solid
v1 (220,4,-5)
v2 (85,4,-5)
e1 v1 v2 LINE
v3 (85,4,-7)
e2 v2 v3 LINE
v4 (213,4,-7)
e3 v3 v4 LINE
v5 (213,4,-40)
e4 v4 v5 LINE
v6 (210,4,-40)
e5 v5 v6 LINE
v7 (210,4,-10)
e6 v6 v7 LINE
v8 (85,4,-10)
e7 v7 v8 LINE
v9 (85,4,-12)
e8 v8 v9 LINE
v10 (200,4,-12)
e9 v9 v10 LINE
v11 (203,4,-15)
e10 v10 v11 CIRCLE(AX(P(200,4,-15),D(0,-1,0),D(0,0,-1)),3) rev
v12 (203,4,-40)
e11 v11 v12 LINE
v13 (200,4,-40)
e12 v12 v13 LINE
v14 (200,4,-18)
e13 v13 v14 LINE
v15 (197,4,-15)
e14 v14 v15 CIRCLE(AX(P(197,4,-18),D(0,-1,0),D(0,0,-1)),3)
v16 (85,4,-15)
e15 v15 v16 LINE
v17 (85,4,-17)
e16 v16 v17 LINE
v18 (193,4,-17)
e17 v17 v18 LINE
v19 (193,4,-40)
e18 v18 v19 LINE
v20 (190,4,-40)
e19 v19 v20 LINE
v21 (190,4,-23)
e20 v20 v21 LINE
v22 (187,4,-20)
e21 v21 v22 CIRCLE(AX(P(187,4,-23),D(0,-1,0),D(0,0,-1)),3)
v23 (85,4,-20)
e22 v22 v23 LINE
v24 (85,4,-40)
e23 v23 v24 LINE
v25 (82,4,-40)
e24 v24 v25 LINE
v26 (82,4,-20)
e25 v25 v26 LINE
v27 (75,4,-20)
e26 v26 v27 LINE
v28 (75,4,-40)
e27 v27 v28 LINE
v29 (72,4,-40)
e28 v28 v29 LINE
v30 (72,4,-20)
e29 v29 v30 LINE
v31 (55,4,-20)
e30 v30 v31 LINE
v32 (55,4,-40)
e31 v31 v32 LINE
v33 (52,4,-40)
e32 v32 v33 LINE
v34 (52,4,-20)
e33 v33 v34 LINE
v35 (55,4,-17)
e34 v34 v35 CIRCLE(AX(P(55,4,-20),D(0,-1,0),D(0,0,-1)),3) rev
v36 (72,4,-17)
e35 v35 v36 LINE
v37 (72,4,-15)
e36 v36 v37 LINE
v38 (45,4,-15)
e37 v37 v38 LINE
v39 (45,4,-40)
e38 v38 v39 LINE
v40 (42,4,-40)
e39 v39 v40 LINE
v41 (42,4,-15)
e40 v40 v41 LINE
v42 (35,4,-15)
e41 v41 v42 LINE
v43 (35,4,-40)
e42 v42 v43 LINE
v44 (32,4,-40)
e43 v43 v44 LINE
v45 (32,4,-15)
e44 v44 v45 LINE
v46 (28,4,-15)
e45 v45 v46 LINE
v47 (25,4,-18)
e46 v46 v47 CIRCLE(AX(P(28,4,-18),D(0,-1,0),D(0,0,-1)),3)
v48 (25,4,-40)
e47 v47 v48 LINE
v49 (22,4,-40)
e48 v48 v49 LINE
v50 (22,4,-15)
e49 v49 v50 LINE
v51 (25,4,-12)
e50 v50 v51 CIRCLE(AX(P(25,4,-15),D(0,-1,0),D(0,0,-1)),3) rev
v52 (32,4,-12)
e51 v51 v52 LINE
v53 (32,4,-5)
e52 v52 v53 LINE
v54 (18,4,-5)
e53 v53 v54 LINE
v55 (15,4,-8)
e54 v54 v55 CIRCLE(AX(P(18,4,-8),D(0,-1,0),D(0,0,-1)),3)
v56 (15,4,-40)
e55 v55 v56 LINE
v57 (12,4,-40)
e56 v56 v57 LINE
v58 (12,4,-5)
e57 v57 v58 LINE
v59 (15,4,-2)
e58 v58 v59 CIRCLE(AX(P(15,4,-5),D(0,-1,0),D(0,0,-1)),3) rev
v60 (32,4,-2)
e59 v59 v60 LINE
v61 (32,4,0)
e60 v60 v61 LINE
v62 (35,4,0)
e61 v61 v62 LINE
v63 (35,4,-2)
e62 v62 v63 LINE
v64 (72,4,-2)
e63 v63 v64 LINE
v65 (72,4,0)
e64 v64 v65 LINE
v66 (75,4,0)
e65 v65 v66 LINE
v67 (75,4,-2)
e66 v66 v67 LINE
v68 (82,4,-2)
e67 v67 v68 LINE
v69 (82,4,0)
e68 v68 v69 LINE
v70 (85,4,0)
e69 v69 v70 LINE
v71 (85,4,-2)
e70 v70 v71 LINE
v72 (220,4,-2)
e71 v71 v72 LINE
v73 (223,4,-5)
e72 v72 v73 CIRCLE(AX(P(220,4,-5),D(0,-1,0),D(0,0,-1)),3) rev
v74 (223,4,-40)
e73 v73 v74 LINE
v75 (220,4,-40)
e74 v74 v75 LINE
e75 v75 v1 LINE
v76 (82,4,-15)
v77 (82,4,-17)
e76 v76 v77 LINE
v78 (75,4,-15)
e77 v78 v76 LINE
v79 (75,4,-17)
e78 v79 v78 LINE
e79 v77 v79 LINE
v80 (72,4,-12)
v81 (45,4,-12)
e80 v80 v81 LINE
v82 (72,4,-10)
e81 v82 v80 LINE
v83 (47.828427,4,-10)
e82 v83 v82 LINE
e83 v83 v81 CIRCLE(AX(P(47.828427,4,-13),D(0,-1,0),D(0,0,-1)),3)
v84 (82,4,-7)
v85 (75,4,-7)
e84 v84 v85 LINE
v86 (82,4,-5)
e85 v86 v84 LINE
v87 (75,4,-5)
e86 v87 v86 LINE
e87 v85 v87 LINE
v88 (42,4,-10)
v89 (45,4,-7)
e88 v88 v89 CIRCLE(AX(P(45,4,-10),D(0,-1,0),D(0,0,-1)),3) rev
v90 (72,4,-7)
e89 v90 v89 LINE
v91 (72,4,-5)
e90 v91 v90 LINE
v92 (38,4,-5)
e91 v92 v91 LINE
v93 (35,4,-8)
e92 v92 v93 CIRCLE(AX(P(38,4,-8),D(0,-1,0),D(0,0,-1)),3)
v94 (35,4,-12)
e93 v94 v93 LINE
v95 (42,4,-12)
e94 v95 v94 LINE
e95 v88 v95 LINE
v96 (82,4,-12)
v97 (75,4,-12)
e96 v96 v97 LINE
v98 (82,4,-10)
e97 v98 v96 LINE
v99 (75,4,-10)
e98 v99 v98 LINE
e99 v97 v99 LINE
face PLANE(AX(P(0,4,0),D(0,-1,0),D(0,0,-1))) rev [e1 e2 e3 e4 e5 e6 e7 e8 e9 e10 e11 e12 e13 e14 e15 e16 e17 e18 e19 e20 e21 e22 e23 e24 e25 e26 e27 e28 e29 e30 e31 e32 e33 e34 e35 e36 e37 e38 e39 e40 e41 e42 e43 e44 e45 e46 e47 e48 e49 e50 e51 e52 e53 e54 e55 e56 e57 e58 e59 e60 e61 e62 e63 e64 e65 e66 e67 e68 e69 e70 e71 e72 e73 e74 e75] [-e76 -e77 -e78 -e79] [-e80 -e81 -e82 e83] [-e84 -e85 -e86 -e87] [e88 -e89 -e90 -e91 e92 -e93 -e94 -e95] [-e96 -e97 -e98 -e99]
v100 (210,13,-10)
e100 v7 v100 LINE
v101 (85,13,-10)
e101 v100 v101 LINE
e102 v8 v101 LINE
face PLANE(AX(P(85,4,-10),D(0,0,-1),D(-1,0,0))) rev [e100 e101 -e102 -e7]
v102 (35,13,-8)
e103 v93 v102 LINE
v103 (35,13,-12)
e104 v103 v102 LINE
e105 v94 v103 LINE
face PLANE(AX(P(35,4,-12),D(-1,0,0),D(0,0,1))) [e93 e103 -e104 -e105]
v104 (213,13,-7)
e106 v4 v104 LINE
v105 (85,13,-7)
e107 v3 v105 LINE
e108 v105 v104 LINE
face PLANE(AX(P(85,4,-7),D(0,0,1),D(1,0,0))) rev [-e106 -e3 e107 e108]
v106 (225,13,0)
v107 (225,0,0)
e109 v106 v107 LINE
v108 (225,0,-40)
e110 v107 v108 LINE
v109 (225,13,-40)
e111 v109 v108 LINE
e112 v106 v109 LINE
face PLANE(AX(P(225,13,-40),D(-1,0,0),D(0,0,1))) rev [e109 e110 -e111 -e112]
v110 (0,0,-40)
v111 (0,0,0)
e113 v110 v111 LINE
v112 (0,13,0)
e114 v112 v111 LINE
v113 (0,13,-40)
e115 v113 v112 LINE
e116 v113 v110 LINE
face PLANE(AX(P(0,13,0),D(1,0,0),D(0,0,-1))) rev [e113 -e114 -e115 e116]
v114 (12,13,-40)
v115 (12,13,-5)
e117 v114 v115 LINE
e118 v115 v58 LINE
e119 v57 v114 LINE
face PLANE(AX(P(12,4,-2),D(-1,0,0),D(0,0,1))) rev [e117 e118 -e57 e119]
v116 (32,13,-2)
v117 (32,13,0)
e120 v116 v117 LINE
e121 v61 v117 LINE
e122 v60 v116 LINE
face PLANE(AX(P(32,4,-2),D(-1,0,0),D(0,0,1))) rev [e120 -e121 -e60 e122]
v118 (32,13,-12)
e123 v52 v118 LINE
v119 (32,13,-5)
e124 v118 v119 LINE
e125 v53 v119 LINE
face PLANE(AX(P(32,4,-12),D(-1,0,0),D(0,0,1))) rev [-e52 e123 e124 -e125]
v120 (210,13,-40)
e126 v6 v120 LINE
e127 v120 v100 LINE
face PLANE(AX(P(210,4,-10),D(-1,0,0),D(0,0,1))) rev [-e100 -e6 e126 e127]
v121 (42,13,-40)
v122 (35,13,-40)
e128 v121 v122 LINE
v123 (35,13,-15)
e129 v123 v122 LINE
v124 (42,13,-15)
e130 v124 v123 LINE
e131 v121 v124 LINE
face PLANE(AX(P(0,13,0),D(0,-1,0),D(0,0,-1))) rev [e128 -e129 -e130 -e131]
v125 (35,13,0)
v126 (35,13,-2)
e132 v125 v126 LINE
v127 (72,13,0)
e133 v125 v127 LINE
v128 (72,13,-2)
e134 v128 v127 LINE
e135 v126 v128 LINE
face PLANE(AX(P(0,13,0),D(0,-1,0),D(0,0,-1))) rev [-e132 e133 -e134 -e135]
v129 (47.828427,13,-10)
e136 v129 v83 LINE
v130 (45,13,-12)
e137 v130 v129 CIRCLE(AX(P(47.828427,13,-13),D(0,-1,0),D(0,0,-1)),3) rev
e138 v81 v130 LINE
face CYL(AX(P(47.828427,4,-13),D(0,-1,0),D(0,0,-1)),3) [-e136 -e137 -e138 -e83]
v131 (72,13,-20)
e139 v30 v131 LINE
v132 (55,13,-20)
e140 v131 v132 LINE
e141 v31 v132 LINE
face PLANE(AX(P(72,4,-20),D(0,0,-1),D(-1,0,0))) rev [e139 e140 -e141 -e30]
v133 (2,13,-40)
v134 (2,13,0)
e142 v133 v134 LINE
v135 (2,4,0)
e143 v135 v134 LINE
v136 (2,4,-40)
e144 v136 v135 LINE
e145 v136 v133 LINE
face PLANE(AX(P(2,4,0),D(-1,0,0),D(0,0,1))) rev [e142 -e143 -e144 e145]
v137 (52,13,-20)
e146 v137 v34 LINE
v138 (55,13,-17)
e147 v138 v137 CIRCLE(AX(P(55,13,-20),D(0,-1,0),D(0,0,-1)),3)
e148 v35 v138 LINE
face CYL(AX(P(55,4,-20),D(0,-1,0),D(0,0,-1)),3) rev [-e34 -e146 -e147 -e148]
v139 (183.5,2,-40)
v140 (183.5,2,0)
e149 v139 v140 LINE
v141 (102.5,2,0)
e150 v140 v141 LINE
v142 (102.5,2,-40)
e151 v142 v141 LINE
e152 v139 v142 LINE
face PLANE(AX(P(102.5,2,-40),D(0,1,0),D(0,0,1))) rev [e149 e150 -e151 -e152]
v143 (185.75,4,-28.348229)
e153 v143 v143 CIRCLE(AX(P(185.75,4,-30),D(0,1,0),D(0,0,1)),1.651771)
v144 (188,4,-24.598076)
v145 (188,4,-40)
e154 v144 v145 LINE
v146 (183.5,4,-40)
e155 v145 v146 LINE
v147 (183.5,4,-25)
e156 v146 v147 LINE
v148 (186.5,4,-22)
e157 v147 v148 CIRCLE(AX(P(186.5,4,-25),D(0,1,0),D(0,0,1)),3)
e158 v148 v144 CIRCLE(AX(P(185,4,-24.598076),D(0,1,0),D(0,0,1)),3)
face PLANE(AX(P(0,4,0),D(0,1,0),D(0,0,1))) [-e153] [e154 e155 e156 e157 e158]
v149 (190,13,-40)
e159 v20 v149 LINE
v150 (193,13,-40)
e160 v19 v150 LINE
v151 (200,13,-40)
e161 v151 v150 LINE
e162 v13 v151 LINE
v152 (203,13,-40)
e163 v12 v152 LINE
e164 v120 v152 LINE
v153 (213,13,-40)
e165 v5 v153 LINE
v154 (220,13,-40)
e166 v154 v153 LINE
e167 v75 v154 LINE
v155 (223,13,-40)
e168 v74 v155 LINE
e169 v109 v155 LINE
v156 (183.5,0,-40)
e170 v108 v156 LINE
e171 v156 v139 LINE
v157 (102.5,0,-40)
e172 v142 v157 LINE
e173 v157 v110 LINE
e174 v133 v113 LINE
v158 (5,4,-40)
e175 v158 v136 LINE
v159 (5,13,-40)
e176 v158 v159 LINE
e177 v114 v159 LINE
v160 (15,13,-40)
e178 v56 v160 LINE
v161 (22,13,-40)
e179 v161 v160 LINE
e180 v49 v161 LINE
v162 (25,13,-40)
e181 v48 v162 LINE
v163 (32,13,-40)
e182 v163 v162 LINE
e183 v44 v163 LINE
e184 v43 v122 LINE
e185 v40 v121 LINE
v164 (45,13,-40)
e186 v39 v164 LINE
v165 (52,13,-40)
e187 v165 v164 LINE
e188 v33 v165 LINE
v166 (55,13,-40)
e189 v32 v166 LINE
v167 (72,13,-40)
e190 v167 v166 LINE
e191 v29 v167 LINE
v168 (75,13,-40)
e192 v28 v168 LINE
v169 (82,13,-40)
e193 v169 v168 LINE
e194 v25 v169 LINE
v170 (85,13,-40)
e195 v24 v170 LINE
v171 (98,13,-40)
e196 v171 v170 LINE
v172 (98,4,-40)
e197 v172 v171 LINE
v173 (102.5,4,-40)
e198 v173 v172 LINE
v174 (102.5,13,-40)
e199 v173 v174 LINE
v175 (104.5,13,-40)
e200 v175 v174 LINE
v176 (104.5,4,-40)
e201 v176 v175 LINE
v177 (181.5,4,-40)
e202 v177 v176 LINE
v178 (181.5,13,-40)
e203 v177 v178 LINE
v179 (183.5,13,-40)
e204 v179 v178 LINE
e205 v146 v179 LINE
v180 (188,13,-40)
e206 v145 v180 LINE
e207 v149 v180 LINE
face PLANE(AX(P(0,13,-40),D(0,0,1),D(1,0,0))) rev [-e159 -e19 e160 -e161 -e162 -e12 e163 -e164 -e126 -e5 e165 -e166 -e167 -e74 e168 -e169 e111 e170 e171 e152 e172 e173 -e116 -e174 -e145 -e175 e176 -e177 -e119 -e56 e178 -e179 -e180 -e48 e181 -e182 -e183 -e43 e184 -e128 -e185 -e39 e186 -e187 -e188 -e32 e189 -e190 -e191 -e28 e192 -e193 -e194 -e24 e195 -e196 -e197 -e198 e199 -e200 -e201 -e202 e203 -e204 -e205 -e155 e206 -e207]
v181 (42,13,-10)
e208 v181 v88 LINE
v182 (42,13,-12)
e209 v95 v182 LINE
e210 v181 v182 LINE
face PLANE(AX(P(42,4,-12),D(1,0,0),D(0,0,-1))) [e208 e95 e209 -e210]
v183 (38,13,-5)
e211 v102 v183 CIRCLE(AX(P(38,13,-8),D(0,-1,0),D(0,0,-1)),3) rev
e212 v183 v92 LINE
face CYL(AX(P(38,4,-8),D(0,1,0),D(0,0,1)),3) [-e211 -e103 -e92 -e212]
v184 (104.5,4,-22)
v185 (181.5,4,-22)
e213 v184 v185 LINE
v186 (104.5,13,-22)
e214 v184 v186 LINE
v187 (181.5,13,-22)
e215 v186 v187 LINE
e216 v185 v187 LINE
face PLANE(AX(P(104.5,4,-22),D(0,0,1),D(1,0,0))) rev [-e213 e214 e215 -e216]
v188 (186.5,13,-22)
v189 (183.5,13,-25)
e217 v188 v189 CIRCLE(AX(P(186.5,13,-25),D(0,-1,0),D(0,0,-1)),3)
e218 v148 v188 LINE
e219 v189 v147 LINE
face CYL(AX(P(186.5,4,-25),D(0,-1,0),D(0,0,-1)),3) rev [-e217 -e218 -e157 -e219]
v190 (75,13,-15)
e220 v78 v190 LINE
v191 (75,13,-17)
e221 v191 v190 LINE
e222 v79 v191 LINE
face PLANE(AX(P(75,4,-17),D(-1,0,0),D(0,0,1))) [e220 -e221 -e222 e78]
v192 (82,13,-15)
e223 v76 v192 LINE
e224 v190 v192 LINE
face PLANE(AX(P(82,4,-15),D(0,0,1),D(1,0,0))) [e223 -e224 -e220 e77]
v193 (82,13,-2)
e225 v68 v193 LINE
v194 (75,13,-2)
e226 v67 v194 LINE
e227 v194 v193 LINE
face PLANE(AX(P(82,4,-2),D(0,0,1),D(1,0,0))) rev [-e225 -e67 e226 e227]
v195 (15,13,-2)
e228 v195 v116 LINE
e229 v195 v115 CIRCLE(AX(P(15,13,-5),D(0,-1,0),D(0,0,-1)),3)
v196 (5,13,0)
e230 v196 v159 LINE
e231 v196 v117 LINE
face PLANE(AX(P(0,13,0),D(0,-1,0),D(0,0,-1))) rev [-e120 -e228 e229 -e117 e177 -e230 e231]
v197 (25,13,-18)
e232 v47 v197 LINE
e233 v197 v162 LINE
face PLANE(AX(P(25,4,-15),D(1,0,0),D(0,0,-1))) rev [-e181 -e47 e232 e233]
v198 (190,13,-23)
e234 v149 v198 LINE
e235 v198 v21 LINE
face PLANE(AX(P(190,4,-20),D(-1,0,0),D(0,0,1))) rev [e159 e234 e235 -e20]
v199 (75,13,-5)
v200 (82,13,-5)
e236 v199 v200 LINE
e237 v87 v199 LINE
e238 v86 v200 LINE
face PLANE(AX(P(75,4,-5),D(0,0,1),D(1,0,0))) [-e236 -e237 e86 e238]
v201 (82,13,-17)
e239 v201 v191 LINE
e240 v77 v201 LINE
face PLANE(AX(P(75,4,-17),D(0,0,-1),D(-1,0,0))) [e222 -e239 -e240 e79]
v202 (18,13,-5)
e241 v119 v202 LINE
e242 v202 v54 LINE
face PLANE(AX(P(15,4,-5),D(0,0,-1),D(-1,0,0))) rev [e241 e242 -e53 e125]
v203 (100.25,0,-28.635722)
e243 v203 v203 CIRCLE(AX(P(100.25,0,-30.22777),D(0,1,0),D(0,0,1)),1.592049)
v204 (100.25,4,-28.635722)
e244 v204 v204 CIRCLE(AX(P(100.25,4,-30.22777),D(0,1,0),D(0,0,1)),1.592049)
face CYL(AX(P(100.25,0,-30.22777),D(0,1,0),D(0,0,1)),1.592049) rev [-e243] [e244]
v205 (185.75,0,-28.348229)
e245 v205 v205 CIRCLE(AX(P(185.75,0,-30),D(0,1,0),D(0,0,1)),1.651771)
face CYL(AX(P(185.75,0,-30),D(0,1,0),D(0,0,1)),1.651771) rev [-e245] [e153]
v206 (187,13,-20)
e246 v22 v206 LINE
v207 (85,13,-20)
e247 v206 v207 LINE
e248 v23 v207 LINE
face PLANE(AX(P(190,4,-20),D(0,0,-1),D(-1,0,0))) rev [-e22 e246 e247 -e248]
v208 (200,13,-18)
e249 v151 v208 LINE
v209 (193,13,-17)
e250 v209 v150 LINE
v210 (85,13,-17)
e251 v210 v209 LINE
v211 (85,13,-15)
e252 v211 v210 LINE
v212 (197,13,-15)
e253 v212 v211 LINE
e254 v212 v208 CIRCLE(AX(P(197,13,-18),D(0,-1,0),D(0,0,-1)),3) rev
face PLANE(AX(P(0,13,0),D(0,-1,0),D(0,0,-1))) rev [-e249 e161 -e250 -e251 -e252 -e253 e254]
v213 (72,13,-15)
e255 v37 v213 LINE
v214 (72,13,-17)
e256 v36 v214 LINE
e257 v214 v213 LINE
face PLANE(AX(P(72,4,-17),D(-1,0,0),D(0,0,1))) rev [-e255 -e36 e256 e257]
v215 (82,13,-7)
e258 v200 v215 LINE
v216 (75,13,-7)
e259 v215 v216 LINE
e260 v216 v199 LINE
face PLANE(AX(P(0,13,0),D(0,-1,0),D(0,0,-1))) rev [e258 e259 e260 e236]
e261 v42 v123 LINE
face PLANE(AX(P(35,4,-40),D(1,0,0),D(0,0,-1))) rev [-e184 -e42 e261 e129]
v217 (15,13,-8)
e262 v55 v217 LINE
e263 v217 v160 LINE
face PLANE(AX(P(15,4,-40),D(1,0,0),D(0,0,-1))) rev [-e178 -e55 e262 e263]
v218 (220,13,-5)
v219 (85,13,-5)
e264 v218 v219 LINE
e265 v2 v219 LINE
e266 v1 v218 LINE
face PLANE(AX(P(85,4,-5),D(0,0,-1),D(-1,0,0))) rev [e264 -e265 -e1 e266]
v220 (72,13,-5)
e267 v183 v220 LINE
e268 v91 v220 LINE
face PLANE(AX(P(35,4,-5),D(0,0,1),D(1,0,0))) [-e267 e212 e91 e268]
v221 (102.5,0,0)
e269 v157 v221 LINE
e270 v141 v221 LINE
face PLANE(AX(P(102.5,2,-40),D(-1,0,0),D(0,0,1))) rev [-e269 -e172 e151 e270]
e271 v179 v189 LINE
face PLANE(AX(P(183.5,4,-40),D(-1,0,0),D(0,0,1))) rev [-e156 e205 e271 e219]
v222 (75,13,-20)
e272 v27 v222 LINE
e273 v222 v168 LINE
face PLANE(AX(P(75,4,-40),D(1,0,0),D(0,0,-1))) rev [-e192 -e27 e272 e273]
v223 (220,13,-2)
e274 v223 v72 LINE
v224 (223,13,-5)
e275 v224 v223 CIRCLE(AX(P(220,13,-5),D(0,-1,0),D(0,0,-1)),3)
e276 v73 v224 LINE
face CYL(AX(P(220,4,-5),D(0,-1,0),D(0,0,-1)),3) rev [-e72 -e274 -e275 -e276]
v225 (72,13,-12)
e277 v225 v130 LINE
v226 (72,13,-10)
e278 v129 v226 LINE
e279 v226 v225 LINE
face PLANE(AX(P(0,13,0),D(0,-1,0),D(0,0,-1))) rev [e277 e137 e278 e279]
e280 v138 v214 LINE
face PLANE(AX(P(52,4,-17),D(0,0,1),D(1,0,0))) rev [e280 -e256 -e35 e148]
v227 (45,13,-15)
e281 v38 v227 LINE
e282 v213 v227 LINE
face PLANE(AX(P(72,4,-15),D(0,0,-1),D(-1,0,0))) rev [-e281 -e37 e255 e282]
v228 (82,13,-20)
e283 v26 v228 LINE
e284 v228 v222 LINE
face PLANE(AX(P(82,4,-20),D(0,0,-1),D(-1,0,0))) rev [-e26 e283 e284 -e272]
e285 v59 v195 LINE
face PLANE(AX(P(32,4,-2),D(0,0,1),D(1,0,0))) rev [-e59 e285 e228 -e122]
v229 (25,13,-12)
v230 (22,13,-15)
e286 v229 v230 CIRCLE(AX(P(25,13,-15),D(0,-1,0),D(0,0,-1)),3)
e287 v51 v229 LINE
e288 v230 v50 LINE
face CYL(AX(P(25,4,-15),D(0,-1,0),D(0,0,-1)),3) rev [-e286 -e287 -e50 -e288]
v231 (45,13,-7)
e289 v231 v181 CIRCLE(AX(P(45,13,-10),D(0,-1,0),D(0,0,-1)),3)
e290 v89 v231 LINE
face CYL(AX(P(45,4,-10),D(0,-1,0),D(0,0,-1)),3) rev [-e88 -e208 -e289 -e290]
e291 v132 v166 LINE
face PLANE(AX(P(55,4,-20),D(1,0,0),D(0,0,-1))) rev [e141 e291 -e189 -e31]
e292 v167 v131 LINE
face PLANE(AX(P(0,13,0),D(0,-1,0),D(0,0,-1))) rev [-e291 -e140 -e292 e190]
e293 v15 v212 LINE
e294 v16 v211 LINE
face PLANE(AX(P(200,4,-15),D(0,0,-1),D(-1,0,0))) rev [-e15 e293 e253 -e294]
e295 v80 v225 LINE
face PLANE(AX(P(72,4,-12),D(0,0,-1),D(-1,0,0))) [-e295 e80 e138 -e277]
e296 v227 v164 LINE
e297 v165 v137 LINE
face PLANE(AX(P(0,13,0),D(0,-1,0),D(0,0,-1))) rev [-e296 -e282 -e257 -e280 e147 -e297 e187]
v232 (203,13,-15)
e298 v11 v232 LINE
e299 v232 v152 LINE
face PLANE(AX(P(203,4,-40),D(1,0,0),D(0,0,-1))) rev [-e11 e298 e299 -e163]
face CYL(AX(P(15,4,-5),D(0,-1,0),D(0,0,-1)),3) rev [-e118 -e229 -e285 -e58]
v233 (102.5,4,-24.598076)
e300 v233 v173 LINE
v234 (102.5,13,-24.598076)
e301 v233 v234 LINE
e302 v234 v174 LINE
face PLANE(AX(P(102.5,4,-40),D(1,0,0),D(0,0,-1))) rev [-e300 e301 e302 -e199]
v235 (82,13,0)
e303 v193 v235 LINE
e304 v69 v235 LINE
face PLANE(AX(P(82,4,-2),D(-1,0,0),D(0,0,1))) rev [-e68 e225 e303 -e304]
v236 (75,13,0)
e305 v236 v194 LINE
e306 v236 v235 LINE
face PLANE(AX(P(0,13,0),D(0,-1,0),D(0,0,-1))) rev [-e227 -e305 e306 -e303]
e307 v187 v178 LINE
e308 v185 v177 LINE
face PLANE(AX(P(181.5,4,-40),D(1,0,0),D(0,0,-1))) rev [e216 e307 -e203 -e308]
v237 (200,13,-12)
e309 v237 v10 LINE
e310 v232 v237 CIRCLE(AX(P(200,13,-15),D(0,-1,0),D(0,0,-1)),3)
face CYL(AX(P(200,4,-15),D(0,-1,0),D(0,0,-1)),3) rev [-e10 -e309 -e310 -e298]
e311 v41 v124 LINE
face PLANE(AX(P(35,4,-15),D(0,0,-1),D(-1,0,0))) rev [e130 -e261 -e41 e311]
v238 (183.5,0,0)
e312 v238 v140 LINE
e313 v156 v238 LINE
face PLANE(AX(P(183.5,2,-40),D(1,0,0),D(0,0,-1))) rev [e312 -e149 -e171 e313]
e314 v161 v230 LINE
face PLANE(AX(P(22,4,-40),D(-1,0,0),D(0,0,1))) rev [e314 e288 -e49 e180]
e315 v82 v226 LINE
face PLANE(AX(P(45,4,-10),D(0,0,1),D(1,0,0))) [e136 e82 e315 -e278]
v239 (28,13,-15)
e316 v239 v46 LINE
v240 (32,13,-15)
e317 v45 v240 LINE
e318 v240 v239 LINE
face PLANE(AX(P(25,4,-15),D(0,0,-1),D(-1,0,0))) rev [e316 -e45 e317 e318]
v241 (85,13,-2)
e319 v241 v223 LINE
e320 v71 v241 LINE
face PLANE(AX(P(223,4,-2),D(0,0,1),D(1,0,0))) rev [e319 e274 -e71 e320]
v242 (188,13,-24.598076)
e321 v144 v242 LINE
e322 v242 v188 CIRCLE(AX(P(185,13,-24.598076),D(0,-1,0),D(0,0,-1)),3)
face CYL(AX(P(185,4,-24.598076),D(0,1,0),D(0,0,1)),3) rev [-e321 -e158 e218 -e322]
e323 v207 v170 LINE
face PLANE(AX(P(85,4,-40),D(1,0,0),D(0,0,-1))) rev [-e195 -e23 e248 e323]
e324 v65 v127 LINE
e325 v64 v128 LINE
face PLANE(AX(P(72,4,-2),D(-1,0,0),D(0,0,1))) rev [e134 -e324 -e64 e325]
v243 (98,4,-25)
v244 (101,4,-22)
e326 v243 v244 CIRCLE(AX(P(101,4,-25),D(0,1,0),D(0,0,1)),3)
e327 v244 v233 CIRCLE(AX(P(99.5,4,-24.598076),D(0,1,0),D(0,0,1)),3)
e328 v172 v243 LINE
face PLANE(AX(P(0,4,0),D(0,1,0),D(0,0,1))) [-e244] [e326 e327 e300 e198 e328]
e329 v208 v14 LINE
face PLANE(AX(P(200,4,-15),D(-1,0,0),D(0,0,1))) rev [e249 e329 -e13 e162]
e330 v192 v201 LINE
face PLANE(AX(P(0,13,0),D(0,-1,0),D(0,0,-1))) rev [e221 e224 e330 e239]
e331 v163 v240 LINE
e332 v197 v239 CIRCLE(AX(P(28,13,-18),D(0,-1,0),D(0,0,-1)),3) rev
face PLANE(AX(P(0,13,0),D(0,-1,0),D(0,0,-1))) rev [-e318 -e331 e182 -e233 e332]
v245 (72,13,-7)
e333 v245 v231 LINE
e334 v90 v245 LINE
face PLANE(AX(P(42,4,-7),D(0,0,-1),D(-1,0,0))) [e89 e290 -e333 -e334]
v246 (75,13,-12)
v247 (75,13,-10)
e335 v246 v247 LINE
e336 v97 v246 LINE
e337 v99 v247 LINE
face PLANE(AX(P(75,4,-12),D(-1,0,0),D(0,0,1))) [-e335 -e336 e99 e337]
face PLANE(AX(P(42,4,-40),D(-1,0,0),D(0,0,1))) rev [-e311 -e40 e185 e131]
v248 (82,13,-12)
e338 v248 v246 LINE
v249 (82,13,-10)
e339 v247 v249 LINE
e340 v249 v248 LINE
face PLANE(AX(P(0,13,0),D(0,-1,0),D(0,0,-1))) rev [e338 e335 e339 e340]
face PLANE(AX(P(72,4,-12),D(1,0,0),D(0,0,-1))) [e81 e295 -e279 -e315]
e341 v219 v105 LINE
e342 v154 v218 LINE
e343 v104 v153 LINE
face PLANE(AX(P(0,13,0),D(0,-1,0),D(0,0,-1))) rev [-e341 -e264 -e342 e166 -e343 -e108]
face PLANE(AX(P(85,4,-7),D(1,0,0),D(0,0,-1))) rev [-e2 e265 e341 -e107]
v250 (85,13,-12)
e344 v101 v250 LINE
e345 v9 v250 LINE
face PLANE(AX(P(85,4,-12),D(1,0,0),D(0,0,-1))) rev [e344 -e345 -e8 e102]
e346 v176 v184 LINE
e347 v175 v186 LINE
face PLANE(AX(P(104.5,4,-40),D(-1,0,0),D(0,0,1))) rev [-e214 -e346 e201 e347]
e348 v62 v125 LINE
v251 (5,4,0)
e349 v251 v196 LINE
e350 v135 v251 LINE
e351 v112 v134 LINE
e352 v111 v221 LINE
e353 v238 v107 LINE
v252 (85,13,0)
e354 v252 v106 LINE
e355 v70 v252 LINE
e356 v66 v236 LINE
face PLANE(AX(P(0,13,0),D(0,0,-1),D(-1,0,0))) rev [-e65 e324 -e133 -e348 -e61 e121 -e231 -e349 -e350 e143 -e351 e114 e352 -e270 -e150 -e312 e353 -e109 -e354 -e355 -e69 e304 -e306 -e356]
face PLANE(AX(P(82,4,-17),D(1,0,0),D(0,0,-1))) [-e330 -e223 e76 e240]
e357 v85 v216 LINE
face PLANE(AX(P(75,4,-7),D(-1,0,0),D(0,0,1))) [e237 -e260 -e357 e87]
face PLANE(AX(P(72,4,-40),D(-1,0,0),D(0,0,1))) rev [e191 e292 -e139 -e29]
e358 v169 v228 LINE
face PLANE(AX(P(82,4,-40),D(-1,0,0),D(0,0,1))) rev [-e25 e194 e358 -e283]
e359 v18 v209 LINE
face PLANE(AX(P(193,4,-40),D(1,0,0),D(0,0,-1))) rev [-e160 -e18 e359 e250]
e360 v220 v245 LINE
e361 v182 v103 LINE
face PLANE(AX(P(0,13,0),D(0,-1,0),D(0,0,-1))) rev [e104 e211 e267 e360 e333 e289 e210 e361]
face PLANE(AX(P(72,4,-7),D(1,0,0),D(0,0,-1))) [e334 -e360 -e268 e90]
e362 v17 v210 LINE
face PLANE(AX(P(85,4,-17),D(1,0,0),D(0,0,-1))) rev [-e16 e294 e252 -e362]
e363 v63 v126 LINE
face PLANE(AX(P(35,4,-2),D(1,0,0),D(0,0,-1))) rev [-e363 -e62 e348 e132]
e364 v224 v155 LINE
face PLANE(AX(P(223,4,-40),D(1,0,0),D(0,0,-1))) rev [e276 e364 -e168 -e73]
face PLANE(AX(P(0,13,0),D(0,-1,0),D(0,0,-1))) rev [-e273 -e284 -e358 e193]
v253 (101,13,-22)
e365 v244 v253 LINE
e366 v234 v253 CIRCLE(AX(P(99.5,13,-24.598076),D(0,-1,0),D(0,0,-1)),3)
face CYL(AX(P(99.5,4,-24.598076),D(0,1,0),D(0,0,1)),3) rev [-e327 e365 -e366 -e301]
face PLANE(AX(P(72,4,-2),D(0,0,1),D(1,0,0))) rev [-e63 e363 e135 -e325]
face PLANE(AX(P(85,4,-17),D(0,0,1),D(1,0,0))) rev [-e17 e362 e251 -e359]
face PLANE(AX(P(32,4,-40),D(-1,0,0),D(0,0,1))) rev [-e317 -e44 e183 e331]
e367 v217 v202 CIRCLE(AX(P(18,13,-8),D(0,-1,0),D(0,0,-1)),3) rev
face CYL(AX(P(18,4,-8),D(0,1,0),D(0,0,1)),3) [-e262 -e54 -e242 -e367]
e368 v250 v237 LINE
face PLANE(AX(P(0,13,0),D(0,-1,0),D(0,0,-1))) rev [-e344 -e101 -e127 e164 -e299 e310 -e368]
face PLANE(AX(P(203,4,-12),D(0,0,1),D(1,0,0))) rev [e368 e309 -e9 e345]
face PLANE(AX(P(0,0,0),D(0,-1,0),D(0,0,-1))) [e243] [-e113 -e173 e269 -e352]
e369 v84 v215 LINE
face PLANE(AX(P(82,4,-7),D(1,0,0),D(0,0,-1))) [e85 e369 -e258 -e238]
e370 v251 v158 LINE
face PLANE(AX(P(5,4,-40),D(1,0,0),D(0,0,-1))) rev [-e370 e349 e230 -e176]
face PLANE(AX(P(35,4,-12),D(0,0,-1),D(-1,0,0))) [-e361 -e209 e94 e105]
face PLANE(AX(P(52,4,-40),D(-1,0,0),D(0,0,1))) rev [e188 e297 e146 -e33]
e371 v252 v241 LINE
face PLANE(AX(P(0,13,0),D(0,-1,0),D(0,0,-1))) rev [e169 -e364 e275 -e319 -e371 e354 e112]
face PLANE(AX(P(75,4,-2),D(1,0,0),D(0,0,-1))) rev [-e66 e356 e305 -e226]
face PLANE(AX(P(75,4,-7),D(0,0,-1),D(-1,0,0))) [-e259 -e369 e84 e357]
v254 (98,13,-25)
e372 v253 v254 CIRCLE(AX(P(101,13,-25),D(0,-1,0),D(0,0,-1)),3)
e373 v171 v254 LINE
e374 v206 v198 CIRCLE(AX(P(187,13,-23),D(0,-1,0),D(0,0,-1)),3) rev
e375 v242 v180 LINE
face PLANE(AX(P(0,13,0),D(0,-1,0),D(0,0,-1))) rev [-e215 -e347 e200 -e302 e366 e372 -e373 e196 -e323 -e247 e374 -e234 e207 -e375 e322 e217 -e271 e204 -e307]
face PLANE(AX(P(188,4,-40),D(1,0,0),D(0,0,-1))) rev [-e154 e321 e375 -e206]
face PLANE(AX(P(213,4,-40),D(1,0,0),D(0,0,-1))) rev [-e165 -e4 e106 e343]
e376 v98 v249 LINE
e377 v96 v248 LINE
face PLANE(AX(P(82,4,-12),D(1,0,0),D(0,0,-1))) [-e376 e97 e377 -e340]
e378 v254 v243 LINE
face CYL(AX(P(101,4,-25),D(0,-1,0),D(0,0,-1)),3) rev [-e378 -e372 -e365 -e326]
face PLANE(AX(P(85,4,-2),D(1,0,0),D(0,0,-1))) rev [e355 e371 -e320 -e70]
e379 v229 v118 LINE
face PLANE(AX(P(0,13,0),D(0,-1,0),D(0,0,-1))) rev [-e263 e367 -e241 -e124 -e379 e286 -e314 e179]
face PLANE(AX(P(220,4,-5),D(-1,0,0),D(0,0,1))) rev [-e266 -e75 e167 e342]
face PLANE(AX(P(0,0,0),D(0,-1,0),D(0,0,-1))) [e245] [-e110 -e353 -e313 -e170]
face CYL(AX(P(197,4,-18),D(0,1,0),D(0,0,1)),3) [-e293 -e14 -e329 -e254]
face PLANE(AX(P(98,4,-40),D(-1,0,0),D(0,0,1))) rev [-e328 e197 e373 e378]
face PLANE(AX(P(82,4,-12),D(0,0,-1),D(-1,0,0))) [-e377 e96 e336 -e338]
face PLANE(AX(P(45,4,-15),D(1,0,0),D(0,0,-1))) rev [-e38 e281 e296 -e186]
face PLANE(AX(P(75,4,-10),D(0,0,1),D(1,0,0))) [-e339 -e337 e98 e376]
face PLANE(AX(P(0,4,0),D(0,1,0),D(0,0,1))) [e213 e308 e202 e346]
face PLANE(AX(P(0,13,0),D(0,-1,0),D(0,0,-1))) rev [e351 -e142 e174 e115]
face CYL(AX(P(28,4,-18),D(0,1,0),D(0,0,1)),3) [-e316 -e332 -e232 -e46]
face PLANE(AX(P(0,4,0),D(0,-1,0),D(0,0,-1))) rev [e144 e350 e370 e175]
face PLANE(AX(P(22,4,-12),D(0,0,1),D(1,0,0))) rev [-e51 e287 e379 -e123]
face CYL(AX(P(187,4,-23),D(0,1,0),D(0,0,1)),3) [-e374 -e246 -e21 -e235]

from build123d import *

# Parameters (mm, degrees)
PROFILESKETCH1_W              = 225
PROFILESKETCH1_H              = 40
PROFILEBOSS_EXTRUDE1_DEPTH    = 13
CABLE_GUIDESSKETCH2_W         = 27
CABLE_GUIDESSKETCH2_H         = 2
CABLE_GUIDESSKETCH2_W_2       = 7
CABLE_GUIDESSKETCH2_W_3       = 3
CABLE_GUIDESSKETCH2_H_2       = 40
CABLE_GUIDESSKETCH2_W_4       = 4.5
CABLE_GUIDESSKETCH2_H_3       = 18
CABLE_GUIDESSKETCH2_W_5       = 77
CABLEGUIDESCUT_EXTRUDE1_DEPTH = 9
FILLET3_R                     = 3
FILLET5_R                     = 3
FILLET6_R                     = 3
FILLET7_R                     = 3
BRIDGESKETCH2_W               = 81
BRIDGESKETCH2_H               = 2
BRIDGECUT_EXTRUDE3_DEPTH      = 229.897356909
MOUNTHOLESSKETCH4_R           = 1.592048555
MOUNTHOLESSKETCH4_R_2         = 1.651770992
MOUNTHOLESCUT_EXTRUDE4_DEPTH  = 229.705050228


with BuildPart() as part:
    # ProfileSketch1 → ProfileBoss-Extrude1 (new body)
    with BuildSketch(Plane(origin=(0, 0, 0), x_dir=(1, 0, 0), z_dir=(0, 1, 0))):
        with Locations((112.5, 20)):
            Rectangle(PROFILESKETCH1_W, PROFILESKETCH1_H)
    extrude(amount=PROFILEBOSS_EXTRUDE1_DEPTH)

    # Cable GuidesSketch2 → CableGuidesCut-Extrude1 (cut)
    # profile 1 of 5: a face of its own
    with BuildSketch(Plane(origin=(0, 13, 0), x_dir=(1, 0, 0), z_dir=(0, 1, 0))):
        Polygon((223, 2), (85, 2), (85, 0), (82, 0), (82, 2), (75, 2), (75, 0), (72, 0), (72, 2), (35, 2), (35, 0), (32, 0), (32, 2), (12, 2), (12, 40), (15, 40), (15, 5), (32, 5), (32, 12), (22, 12), (22, 40), (25, 40), (25, 15), (32, 15), (32, 40), (35, 40), (35, 15), (42, 15), (42, 40), (45, 40), (45, 15), (72, 15), (72, 17), (52, 17), (52, 40), (55, 40), (55, 20), (72, 20), (72, 40), (75, 40), (75, 20), (82, 20), (82, 40), (85, 40), (85, 20), (190, 20), (190, 40), (193, 40), (193, 17), (85, 17), (85, 15), (200, 15), (200, 40), (203, 40), (203, 12), (85, 12), (85, 10), (210, 10), (210, 40), (213, 40), (213, 7), (85, 7), (85, 5), (220, 5), (220, 40), (223, 40), align=None)
        Polygon((42, 7), (72, 7), (72, 5), (35, 5), (35, 12), (42, 12), align=None, mode=Mode.SUBTRACT)
        with Locations((58.5, 11)):
            Rectangle(CABLE_GUIDESSKETCH2_W, CABLE_GUIDESSKETCH2_H, mode=Mode.SUBTRACT)
        with Locations((78.5, 16)):
            Rectangle(CABLE_GUIDESSKETCH2_W_2, CABLE_GUIDESSKETCH2_H, mode=Mode.SUBTRACT)
        with Locations((78.5, 11)):
            Rectangle(CABLE_GUIDESSKETCH2_W_2, CABLE_GUIDESSKETCH2_H, mode=Mode.SUBTRACT)
        with Locations((78.5, 6)):
            Rectangle(CABLE_GUIDESSKETCH2_W_2, CABLE_GUIDESSKETCH2_H, mode=Mode.SUBTRACT)
    # profile 2 of 5: a face of its own
    with BuildSketch(Plane(origin=(0, 13, 0), x_dir=(1, 0, 0), z_dir=(0, 1, 0))):
        with Locations((3.5, 20)):
            Rectangle(CABLE_GUIDESSKETCH2_W_3, CABLE_GUIDESSKETCH2_H_2)
    # profile 3 of 5: a face of its own
    with BuildSketch(Plane(origin=(0, 13, 0), x_dir=(1, 0, 0), z_dir=(0, 1, 0))):
        with Locations((100.25, 31)):
            Rectangle(CABLE_GUIDESSKETCH2_W_4, CABLE_GUIDESSKETCH2_H_3)
    # profile 4 of 5: a face of its own
    with BuildSketch(Plane(origin=(0, 13, 0), x_dir=(1, 0, 0), z_dir=(0, 1, 0))):
        with Locations((185.75, 31)):
            Rectangle(CABLE_GUIDESSKETCH2_W_4, CABLE_GUIDESSKETCH2_H_3)
    # profile 5 of 5: a face of its own
    with BuildSketch(Plane(origin=(0, 13, 0), x_dir=(1, 0, 0), z_dir=(0, 1, 0))):
        with Locations((143, 31)):
            Rectangle(CABLE_GUIDESSKETCH2_W_5, CABLE_GUIDESSKETCH2_H_3)
    extrude(amount=-CABLEGUIDESCUT_EXTRUDE1_DEPTH, mode=Mode.SUBTRACT)

    # Fillet3
    fillet3_edges = [part.edges().sort_by_distance(p)[0] for p in [
        (183.5, 8.5, -22),
        (12, 8.5, -2),
        (22, 8.5, -12),
        (52, 8.5, -17),
        (42, 8.5, -7),
        (98, 8.5, -22),
    ]]
    fillet(fillet3_edges, radius=FILLET3_R)

    # Fillet5
    # the kernel refuses this fillet: 3 mm, written as the material it adds along each edge
    with BuildSketch(Plane(origin=(188, 13, -22), x_dir=(0, 0, -1), z_dir=(0, -1, 0)), Plane(origin=(102.5, 13, -22), x_dir=(0, 0, -1), z_dir=(0, -1, 0))) as fillet5_piece_1:
        with BuildLine():
            CenterArc((2.598076211, -3), FILLET5_R, 90, 60)
            Line((0, -1.5), (0, 0))
            Line((0, 0), (2.598076211, 0))
        make_face()
    extrude(amount=9)
    # the kernel refuses this fillet: 3 mm, written as the material it takes off along each edge
    with BuildSketch(Plane(origin=(200, 20.5, -15), x_dir=(0, 0, -1), z_dir=(0, -1, 0)), Plane(origin=(190, 20.5, -20), x_dir=(0, 0, -1), z_dir=(0, -1, 0))) as fillet5_2_piece_1:
        with BuildLine():
            CenterArc((FILLET5_R, -FILLET5_R), FILLET5_R, 90, 90)
            Line((0, -FILLET5_R), (0, 0))
            Line((0, 0), (FILLET5_R, 0))
        make_face()
    extrude(amount=16.5, mode=Mode.SUBTRACT)

    # Fillet6
    fillet6_edges = [part.edges().sort_by_distance(p)[0] for p in [
        (223, 8.5, -2),
        (203, 8.5, -12),
    ]]
    fillet(fillet6_edges, radius=FILLET6_R)

    # Fillet7
    # the kernel refuses this fillet: 3 mm, written as the material it takes off along each edge
    with BuildSketch(Plane(origin=(35, 20.5, -5), x_dir=(0, 0, -1), z_dir=(0, -1, 0)), Plane(origin=(15, 20.5, -5), x_dir=(0, 0, -1), z_dir=(0, -1, 0)), Plane(origin=(25, 20.5, -15), x_dir=(0, 0, -1), z_dir=(0, -1, 0))) as fillet7_piece_1:
        with BuildLine():
            CenterArc((FILLET7_R, FILLET7_R), FILLET7_R, 180, 90)
            Line((0, FILLET7_R), (-FILLET7_R * 0.02, FILLET7_R))
            Line((-FILLET7_R * 0.02, FILLET7_R), (-FILLET7_R * 0.02, -FILLET7_R * 0.02))
            Line((-FILLET7_R * 0.02, -FILLET7_R * 0.02), (FILLET7_R, -FILLET7_R * 0.02))
            Line((FILLET7_R, -FILLET7_R * 0.02), (FILLET7_R, 0))
        make_face()
    extrude(amount=16.5, mode=Mode.SUBTRACT)
    with BuildSketch(Plane(origin=(45, 20.071067812, -10), x_dir=(1, 0, 0), z_dir=(0, -1, 0))) as fillet7_piece_2:
        with BuildLine():
            CenterArc((2.828427125, -3), FILLET7_R, 90, 70.528779366)
            Line((0, -2), (-0.056568542, -1.98))
            ThreePointArc((-0.056568542, -1.98), (-0.06, -1), (-0.06, 0))
            Line((-0.06, 0), (0, 0.06))
            Line((0, 0.06), (2.828427125, 0.06))
            Line((2.828427125, 0.06), (2.828427125, 0))
        make_face()
    extrude(amount=16.071067812, mode=Mode.SUBTRACT)

    # BridgeSketch2 → BridgeCut-Extrude3 (cut, through all)
    with BuildSketch(Plane.XY):
        with Locations((143, 1)):
            Rectangle(BRIDGESKETCH2_W, BRIDGESKETCH2_H)
    extrude(amount=-BRIDGECUT_EXTRUDE3_DEPTH, mode=Mode.SUBTRACT)

    # MountHolesSketch4 → MountHolesCut-Extrude4 (cut, through all)
    with BuildSketch(Plane(origin=(0, 4, 0), x_dir=(1, 0, 0), z_dir=(0, 1, 0))):
        with Locations(Location((100.25, 30.227770246, 0), (0, 0, 270))):
            Circle(MOUNTHOLESSKETCH4_R)
        with Locations(Location((185.75, 30, 0), (0, 0, 270))):
            Circle(MOUNTHOLESSKETCH4_R_2)
    extrude(amount=-MOUNTHOLESCUT_EXTRUDE4_DEPTH, mode=Mode.SUBTRACT)


solid = part.part
